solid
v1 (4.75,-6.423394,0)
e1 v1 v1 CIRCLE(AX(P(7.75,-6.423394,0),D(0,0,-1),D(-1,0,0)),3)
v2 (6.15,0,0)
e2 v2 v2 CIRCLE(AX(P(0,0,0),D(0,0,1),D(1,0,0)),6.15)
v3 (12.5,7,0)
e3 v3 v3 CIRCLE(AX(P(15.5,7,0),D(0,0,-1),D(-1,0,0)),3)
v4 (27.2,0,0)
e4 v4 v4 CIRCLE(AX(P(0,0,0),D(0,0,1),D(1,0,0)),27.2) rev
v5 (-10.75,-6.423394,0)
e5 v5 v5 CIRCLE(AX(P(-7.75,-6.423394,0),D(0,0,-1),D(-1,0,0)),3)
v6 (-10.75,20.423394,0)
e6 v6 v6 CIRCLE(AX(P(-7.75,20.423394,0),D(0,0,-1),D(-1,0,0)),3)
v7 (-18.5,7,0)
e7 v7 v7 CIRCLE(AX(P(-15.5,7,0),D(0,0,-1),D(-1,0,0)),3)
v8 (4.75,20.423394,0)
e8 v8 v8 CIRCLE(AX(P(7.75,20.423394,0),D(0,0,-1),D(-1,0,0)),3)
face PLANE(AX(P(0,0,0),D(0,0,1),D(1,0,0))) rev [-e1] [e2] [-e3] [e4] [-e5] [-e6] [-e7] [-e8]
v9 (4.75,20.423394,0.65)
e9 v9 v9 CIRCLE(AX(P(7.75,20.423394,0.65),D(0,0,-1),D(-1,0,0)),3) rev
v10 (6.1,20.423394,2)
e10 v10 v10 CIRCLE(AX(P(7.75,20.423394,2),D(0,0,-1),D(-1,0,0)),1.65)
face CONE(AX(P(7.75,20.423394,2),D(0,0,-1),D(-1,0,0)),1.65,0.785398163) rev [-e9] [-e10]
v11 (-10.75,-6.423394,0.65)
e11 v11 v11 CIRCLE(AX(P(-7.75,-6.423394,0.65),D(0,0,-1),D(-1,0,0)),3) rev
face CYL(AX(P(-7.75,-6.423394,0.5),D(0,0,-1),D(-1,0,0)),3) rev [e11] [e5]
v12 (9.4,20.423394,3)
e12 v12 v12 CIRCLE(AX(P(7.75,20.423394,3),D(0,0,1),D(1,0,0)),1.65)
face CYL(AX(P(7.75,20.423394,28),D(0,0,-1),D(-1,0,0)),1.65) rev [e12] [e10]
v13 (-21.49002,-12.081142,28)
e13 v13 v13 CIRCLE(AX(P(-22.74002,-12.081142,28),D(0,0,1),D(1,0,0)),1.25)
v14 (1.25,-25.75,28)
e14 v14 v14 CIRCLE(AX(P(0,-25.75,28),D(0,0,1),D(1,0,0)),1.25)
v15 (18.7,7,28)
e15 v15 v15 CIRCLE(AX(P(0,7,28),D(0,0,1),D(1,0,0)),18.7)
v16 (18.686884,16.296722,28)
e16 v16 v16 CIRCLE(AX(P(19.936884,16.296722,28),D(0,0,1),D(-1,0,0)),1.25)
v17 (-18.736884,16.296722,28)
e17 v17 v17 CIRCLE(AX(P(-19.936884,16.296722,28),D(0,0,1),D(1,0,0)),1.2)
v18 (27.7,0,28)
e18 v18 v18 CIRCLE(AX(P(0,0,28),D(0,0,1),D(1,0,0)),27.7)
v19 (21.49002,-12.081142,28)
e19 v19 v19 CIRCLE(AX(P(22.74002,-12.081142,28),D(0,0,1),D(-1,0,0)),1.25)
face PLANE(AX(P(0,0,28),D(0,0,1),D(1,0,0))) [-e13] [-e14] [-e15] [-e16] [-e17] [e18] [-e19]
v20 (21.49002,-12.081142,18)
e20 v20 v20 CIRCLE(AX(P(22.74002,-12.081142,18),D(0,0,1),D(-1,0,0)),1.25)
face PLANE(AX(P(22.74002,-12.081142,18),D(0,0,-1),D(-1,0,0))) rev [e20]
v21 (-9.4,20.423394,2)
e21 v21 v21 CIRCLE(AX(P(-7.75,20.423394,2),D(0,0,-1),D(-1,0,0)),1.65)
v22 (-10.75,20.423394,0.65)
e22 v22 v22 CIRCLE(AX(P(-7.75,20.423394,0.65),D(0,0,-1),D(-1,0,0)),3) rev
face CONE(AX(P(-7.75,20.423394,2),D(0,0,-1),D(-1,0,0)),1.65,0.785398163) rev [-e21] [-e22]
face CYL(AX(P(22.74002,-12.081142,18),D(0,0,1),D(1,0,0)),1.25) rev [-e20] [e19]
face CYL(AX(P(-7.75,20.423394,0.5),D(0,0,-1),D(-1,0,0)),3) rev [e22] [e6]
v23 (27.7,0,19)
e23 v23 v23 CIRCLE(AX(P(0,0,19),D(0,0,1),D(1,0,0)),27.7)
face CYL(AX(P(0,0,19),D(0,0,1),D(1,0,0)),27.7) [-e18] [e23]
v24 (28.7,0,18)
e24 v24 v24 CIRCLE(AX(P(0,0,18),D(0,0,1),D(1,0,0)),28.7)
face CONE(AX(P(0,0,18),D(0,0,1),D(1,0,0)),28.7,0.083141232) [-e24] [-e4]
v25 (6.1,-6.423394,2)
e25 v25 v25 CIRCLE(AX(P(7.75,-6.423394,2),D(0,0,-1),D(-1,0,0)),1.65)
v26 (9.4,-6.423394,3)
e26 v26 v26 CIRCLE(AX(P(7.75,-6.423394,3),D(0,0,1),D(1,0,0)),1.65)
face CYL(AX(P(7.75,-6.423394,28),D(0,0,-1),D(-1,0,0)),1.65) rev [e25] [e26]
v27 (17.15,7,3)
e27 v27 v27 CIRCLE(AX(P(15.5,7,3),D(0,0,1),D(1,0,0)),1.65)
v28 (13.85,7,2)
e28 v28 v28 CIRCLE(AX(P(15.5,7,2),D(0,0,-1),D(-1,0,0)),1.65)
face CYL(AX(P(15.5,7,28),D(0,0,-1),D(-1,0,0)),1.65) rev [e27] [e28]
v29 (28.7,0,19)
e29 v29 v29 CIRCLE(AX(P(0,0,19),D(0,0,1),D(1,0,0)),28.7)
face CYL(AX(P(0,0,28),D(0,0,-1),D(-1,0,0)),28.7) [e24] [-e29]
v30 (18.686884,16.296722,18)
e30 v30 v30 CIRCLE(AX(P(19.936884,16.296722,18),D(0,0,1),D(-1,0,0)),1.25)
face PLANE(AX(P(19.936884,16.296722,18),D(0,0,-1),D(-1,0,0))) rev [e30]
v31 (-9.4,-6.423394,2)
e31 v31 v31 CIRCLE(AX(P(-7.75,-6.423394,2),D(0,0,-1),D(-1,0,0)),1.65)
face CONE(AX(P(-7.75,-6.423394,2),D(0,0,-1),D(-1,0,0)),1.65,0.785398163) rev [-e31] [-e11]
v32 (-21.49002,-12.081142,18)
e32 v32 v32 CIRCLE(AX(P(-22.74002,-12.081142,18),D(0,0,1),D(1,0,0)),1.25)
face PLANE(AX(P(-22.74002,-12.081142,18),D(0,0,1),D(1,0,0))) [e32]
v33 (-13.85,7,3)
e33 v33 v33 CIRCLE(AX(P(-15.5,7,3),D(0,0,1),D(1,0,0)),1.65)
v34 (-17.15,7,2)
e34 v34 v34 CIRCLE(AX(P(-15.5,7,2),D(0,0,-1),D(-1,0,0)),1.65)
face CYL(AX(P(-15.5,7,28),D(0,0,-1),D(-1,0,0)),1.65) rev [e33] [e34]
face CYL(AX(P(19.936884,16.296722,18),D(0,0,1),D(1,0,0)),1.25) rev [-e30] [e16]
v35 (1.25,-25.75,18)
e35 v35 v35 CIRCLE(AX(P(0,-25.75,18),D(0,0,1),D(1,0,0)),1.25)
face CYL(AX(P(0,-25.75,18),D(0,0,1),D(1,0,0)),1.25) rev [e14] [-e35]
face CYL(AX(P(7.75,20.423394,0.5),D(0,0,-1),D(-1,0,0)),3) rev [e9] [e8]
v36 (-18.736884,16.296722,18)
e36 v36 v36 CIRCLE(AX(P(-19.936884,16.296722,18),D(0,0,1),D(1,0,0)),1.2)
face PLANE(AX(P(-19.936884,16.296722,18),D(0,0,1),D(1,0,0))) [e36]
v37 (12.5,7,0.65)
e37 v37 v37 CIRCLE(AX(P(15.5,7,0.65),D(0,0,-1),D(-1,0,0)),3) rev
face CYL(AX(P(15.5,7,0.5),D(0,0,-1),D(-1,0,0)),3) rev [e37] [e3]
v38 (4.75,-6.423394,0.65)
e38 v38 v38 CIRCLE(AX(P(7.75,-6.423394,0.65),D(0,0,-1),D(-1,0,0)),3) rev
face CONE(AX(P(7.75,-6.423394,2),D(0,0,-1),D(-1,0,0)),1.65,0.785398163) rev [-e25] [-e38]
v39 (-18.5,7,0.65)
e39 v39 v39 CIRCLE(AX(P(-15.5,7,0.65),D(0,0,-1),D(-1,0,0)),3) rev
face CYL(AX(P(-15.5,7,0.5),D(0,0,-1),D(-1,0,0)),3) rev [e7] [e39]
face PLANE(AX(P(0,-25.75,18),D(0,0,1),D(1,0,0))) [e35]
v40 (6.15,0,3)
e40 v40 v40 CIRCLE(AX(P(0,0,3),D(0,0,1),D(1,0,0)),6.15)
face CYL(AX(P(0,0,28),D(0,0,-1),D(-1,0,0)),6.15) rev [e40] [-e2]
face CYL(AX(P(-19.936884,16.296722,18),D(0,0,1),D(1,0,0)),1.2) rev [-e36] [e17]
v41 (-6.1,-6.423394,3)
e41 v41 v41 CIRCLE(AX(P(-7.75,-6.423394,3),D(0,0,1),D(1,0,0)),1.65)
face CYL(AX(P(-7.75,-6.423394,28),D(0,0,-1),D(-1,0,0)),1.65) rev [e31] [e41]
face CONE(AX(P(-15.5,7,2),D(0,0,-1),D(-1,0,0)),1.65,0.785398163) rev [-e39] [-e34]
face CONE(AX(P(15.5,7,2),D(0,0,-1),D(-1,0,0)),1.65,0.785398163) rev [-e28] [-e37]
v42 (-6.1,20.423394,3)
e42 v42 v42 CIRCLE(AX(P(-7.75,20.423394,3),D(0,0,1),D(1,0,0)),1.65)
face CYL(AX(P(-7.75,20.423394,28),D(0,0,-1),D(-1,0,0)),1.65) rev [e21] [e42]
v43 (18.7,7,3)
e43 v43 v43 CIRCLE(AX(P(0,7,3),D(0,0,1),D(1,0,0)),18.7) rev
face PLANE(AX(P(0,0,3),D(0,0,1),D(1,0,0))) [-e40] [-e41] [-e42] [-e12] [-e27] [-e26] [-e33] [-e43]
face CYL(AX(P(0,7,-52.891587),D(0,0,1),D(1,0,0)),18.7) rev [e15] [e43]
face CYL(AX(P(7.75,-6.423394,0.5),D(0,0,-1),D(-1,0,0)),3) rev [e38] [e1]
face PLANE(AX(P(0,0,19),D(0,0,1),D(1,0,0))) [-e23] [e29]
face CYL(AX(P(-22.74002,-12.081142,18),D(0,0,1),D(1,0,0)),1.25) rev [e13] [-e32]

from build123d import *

# Parameters (mm, degrees)
SKETCH1_R              = 28.7
SKETCH1_R_2            = 6.15
SKETCH1_R_3            = 1.65
EXTRUDE_510_DEPTH      = 28
SKETCH2_R              = 18.7
CUT_EXTRUDE_689_DEPTH  = 25
CUT_EXTRUDE_START      = -9
SKETCH4_R              = 28.7
SKETCH4_R_2            = 27.7
CUT_EXTRUDE_844_DEPTH  = 9
SKETCH5_R              = 1.25
SKETCH5_R_2            = 1.2
CUT_EXTRUDE_1374_DEPTH = 10
SKETCH_1_R             = 3
CUT_EXTRUDE_1690_DEPTH = 0.5
CHAMFER_1743_SIZE      = 1.5
CHAMFER_1_SIZE         = 1.5
CHAMFER_1_SIZE2        = 18


with BuildPart() as part:
    # Sketch1 → Extrude 510 (new body)
    with BuildSketch(Plane.XY):
        Circle(SKETCH1_R)
        Circle(SKETCH1_R_2, mode=Mode.SUBTRACT)
        with Locations((15.5, 7)):
            Circle(SKETCH1_R_3, mode=Mode.SUBTRACT)
        with Locations((7.75, -6.423393759)):
            Circle(SKETCH1_R_3, mode=Mode.SUBTRACT)
        with Locations((-7.75, -6.423393759)):
            Circle(SKETCH1_R_3, mode=Mode.SUBTRACT)
        with Locations((-15.5, 7)):
            Circle(SKETCH1_R_3, mode=Mode.SUBTRACT)
        with Locations((-7.75, 20.423393759)):
            Circle(SKETCH1_R_3, mode=Mode.SUBTRACT)
        with Locations((7.75, 20.423393759)):
            Circle(SKETCH1_R_3, mode=Mode.SUBTRACT)
    extrude(amount=EXTRUDE_510_DEPTH)

    # Sketch2 → Cut-Extrude 689 (cut)
    with BuildSketch(Plane.XY.offset(28)):
        with Locations((0, 7)):
            Circle(SKETCH2_R)
    extrude(amount=-CUT_EXTRUDE_689_DEPTH, mode=Mode.SUBTRACT)

    # Sketch4 → Cut-Extrude 844 (cut)
    with BuildSketch(Plane.XY.offset(28).offset(CUT_EXTRUDE_START)):
        Circle(SKETCH4_R)
        Circle(SKETCH4_R_2, mode=Mode.SUBTRACT)
    extrude(amount=CUT_EXTRUDE_844_DEPTH, mode=Mode.SUBTRACT)

    # Sketch5 → Cut-Extrude 1374 (cut)
    with BuildSketch(Plane.XY.offset(28)):
        with Locations((-22.74001983, -12.081142252)):
            Circle(SKETCH5_R)
        with Locations((0, -25.75)):
            Circle(SKETCH5_R)
        with Locations(Location((19.936884337, 16.296721846, 0), (0, 0, 180))):
            Circle(SKETCH5_R)
        with Locations(Location((22.74001983, -12.081142252, 0), (0, 0, 180))):
            Circle(SKETCH5_R)
        with Locations((-19.936884337, 16.296721846)):
            Circle(SKETCH5_R_2)
    extrude(amount=-CUT_EXTRUDE_1374_DEPTH, mode=Mode.SUBTRACT)

    # Эскиз1 → Cut-Extrude 1690 (cut)
    with BuildSketch(Plane(origin=(0, 0, 0), x_dir=(-1, 0, 0), z_dir=(0, 0, -1))):
        with Locations((-7.75, 20.423393759)):
            Circle(SKETCH_1_R)
        with Locations((7.75, 20.423393759)):
            Circle(SKETCH_1_R)
        with Locations((15.5, 7)):
            Circle(SKETCH_1_R)
        with Locations((7.75, -6.423393759)):
            Circle(SKETCH_1_R)
        with Locations((-7.75, -6.423393759)):
            Circle(SKETCH_1_R)
        with Locations((-15.5, 7)):
            Circle(SKETCH_1_R)
    extrude(amount=-CUT_EXTRUDE_1690_DEPTH, mode=Mode.SUBTRACT)

    # Chamfer 1743
    # the kernel refuses this chamfer: 1.5 mm, written as the material it takes off along each edge
    with BuildSketch(Plane(origin=(15.5, 7, 0.5), x_dir=(1, 0, 0), z_dir=(0, 1, 0))) as chamfer_1743_piece_1_section:
        Polygon((1.65 + CHAMFER_1743_SIZE, 0), (1.65, -CHAMFER_1743_SIZE), (1.65, 0), align=None)
    chamfer_1743_piece_1 = revolve(axis=Axis((15.5, 7, 0.5), (0, 0, -1)), mode=Mode.PRIVATE)
    chamfer_1743_piece_1 = chamfer_1743_piece_1 & Plane(origin=(15.5, 7, 1.328305934), x_dir=(-1, 0, 0), z_dir=(0, 0, -1)) * Cylinder(3, 13, mode=Mode.PRIVATE)
    add(chamfer_1743_piece_1, mode=Mode.SUBTRACT)
    with BuildSketch(Plane(origin=(7.75, -6.423393759, 0.5), x_dir=(1, 0, 0), z_dir=(0, 1, 0))) as chamfer_1743_piece_2_section:
        Polygon((1.65 + CHAMFER_1743_SIZE, 0), (1.65, -CHAMFER_1743_SIZE), (1.65, 0), align=None)
    chamfer_1743_piece_2 = revolve(axis=Axis((7.75, -6.423393759, 0.5), (0, 0, -1)), mode=Mode.PRIVATE)
    chamfer_1743_piece_2 = chamfer_1743_piece_2 & Plane(origin=(7.75, -6.423393759, 1.328305934), x_dir=(-1, 0, 0), z_dir=(0, 0, -1)) * Cylinder(3, 13, mode=Mode.PRIVATE)
    add(chamfer_1743_piece_2, mode=Mode.SUBTRACT)
    with BuildSketch(Plane(origin=(-7.75, -6.423393759, 0.5), x_dir=(1, 0, 0), z_dir=(0, 1, 0))) as chamfer_1743_piece_3_section:
        Polygon((1.65 + CHAMFER_1743_SIZE, 0), (1.65, -CHAMFER_1743_SIZE), (1.65, 0), align=None)
    chamfer_1743_piece_3 = revolve(axis=Axis((-7.75, -6.423393759, 0.5), (0, 0, -1)), mode=Mode.PRIVATE)
    chamfer_1743_piece_3 = chamfer_1743_piece_3 & Plane(origin=(-7.75, -6.423393759, 1.328305934), x_dir=(-1, 0, 0), z_dir=(0, 0, -1)) * Cylinder(3, 13, mode=Mode.PRIVATE)
    add(chamfer_1743_piece_3, mode=Mode.SUBTRACT)
    with BuildSketch(Plane(origin=(-15.5, 7, 0.5), x_dir=(1, 0, 0), z_dir=(0, 1, 0))) as chamfer_1743_piece_4_section:
        Polygon((1.65 + CHAMFER_1743_SIZE, 0), (1.65, -CHAMFER_1743_SIZE), (1.65, 0), align=None)
    chamfer_1743_piece_4 = revolve(axis=Axis((-15.5, 7, 0.5), (0, 0, -1)), mode=Mode.PRIVATE)
    chamfer_1743_piece_4 = chamfer_1743_piece_4 & Plane(origin=(-15.5, 7, 1.328305934), x_dir=(-1, 0, 0), z_dir=(0, 0, -1)) * Cylinder(3, 13, mode=Mode.PRIVATE)
    add(chamfer_1743_piece_4, mode=Mode.SUBTRACT)
    with BuildSketch(Plane(origin=(-7.75, 20.423393759, 0.5), x_dir=(1, 0, 0), z_dir=(0, 1, 0))) as chamfer_1743_piece_5_section:
        Polygon((1.65 + CHAMFER_1743_SIZE, 0), (1.65, -CHAMFER_1743_SIZE), (1.65, 0), align=None)
    chamfer_1743_piece_5 = revolve(axis=Axis((-7.75, 20.423393759, 0.5), (0, 0, -1)), mode=Mode.PRIVATE)
    chamfer_1743_piece_5 = chamfer_1743_piece_5 & Plane(origin=(-7.75, 20.423393759, 1.328305934), x_dir=(-1, 0, 0), z_dir=(0, 0, -1)) * Cylinder(3, 13, mode=Mode.PRIVATE)
    add(chamfer_1743_piece_5, mode=Mode.SUBTRACT)
    with BuildSketch(Plane(origin=(7.75, 20.423393759, 0.5), x_dir=(1, 0, 0), z_dir=(0, 1, 0))) as chamfer_1743_piece_6_section:
        Polygon((1.65 + CHAMFER_1743_SIZE, 0), (1.65, -CHAMFER_1743_SIZE), (1.65, 0), align=None)
    chamfer_1743_piece_6 = revolve(axis=Axis((7.75, 20.423393759, 0.5), (0, 0, -1)), mode=Mode.PRIVATE)
    chamfer_1743_piece_6 = chamfer_1743_piece_6 & Plane(origin=(7.75, 20.423393759, 1.328305934), x_dir=(-1, 0, 0), z_dir=(0, 0, -1)) * Cylinder(3, 13, mode=Mode.PRIVATE)
    add(chamfer_1743_piece_6, mode=Mode.SUBTRACT)

    # Фаска1
    chamfer_1_edges = [part.edges().sort_by_distance(p)[0] for p in [
        (-28.7, 0, 0),
    ]]
    chamfer_1_side = [part.faces().sort_by_distance(p)[0] for p in [
        (-27.888241415, 0, 0),
    ]]
    chamfer(chamfer_1_edges, length=CHAMFER_1_SIZE, length2=CHAMFER_1_SIZE2, reference=chamfer_1_side[0])


solid = part.part
